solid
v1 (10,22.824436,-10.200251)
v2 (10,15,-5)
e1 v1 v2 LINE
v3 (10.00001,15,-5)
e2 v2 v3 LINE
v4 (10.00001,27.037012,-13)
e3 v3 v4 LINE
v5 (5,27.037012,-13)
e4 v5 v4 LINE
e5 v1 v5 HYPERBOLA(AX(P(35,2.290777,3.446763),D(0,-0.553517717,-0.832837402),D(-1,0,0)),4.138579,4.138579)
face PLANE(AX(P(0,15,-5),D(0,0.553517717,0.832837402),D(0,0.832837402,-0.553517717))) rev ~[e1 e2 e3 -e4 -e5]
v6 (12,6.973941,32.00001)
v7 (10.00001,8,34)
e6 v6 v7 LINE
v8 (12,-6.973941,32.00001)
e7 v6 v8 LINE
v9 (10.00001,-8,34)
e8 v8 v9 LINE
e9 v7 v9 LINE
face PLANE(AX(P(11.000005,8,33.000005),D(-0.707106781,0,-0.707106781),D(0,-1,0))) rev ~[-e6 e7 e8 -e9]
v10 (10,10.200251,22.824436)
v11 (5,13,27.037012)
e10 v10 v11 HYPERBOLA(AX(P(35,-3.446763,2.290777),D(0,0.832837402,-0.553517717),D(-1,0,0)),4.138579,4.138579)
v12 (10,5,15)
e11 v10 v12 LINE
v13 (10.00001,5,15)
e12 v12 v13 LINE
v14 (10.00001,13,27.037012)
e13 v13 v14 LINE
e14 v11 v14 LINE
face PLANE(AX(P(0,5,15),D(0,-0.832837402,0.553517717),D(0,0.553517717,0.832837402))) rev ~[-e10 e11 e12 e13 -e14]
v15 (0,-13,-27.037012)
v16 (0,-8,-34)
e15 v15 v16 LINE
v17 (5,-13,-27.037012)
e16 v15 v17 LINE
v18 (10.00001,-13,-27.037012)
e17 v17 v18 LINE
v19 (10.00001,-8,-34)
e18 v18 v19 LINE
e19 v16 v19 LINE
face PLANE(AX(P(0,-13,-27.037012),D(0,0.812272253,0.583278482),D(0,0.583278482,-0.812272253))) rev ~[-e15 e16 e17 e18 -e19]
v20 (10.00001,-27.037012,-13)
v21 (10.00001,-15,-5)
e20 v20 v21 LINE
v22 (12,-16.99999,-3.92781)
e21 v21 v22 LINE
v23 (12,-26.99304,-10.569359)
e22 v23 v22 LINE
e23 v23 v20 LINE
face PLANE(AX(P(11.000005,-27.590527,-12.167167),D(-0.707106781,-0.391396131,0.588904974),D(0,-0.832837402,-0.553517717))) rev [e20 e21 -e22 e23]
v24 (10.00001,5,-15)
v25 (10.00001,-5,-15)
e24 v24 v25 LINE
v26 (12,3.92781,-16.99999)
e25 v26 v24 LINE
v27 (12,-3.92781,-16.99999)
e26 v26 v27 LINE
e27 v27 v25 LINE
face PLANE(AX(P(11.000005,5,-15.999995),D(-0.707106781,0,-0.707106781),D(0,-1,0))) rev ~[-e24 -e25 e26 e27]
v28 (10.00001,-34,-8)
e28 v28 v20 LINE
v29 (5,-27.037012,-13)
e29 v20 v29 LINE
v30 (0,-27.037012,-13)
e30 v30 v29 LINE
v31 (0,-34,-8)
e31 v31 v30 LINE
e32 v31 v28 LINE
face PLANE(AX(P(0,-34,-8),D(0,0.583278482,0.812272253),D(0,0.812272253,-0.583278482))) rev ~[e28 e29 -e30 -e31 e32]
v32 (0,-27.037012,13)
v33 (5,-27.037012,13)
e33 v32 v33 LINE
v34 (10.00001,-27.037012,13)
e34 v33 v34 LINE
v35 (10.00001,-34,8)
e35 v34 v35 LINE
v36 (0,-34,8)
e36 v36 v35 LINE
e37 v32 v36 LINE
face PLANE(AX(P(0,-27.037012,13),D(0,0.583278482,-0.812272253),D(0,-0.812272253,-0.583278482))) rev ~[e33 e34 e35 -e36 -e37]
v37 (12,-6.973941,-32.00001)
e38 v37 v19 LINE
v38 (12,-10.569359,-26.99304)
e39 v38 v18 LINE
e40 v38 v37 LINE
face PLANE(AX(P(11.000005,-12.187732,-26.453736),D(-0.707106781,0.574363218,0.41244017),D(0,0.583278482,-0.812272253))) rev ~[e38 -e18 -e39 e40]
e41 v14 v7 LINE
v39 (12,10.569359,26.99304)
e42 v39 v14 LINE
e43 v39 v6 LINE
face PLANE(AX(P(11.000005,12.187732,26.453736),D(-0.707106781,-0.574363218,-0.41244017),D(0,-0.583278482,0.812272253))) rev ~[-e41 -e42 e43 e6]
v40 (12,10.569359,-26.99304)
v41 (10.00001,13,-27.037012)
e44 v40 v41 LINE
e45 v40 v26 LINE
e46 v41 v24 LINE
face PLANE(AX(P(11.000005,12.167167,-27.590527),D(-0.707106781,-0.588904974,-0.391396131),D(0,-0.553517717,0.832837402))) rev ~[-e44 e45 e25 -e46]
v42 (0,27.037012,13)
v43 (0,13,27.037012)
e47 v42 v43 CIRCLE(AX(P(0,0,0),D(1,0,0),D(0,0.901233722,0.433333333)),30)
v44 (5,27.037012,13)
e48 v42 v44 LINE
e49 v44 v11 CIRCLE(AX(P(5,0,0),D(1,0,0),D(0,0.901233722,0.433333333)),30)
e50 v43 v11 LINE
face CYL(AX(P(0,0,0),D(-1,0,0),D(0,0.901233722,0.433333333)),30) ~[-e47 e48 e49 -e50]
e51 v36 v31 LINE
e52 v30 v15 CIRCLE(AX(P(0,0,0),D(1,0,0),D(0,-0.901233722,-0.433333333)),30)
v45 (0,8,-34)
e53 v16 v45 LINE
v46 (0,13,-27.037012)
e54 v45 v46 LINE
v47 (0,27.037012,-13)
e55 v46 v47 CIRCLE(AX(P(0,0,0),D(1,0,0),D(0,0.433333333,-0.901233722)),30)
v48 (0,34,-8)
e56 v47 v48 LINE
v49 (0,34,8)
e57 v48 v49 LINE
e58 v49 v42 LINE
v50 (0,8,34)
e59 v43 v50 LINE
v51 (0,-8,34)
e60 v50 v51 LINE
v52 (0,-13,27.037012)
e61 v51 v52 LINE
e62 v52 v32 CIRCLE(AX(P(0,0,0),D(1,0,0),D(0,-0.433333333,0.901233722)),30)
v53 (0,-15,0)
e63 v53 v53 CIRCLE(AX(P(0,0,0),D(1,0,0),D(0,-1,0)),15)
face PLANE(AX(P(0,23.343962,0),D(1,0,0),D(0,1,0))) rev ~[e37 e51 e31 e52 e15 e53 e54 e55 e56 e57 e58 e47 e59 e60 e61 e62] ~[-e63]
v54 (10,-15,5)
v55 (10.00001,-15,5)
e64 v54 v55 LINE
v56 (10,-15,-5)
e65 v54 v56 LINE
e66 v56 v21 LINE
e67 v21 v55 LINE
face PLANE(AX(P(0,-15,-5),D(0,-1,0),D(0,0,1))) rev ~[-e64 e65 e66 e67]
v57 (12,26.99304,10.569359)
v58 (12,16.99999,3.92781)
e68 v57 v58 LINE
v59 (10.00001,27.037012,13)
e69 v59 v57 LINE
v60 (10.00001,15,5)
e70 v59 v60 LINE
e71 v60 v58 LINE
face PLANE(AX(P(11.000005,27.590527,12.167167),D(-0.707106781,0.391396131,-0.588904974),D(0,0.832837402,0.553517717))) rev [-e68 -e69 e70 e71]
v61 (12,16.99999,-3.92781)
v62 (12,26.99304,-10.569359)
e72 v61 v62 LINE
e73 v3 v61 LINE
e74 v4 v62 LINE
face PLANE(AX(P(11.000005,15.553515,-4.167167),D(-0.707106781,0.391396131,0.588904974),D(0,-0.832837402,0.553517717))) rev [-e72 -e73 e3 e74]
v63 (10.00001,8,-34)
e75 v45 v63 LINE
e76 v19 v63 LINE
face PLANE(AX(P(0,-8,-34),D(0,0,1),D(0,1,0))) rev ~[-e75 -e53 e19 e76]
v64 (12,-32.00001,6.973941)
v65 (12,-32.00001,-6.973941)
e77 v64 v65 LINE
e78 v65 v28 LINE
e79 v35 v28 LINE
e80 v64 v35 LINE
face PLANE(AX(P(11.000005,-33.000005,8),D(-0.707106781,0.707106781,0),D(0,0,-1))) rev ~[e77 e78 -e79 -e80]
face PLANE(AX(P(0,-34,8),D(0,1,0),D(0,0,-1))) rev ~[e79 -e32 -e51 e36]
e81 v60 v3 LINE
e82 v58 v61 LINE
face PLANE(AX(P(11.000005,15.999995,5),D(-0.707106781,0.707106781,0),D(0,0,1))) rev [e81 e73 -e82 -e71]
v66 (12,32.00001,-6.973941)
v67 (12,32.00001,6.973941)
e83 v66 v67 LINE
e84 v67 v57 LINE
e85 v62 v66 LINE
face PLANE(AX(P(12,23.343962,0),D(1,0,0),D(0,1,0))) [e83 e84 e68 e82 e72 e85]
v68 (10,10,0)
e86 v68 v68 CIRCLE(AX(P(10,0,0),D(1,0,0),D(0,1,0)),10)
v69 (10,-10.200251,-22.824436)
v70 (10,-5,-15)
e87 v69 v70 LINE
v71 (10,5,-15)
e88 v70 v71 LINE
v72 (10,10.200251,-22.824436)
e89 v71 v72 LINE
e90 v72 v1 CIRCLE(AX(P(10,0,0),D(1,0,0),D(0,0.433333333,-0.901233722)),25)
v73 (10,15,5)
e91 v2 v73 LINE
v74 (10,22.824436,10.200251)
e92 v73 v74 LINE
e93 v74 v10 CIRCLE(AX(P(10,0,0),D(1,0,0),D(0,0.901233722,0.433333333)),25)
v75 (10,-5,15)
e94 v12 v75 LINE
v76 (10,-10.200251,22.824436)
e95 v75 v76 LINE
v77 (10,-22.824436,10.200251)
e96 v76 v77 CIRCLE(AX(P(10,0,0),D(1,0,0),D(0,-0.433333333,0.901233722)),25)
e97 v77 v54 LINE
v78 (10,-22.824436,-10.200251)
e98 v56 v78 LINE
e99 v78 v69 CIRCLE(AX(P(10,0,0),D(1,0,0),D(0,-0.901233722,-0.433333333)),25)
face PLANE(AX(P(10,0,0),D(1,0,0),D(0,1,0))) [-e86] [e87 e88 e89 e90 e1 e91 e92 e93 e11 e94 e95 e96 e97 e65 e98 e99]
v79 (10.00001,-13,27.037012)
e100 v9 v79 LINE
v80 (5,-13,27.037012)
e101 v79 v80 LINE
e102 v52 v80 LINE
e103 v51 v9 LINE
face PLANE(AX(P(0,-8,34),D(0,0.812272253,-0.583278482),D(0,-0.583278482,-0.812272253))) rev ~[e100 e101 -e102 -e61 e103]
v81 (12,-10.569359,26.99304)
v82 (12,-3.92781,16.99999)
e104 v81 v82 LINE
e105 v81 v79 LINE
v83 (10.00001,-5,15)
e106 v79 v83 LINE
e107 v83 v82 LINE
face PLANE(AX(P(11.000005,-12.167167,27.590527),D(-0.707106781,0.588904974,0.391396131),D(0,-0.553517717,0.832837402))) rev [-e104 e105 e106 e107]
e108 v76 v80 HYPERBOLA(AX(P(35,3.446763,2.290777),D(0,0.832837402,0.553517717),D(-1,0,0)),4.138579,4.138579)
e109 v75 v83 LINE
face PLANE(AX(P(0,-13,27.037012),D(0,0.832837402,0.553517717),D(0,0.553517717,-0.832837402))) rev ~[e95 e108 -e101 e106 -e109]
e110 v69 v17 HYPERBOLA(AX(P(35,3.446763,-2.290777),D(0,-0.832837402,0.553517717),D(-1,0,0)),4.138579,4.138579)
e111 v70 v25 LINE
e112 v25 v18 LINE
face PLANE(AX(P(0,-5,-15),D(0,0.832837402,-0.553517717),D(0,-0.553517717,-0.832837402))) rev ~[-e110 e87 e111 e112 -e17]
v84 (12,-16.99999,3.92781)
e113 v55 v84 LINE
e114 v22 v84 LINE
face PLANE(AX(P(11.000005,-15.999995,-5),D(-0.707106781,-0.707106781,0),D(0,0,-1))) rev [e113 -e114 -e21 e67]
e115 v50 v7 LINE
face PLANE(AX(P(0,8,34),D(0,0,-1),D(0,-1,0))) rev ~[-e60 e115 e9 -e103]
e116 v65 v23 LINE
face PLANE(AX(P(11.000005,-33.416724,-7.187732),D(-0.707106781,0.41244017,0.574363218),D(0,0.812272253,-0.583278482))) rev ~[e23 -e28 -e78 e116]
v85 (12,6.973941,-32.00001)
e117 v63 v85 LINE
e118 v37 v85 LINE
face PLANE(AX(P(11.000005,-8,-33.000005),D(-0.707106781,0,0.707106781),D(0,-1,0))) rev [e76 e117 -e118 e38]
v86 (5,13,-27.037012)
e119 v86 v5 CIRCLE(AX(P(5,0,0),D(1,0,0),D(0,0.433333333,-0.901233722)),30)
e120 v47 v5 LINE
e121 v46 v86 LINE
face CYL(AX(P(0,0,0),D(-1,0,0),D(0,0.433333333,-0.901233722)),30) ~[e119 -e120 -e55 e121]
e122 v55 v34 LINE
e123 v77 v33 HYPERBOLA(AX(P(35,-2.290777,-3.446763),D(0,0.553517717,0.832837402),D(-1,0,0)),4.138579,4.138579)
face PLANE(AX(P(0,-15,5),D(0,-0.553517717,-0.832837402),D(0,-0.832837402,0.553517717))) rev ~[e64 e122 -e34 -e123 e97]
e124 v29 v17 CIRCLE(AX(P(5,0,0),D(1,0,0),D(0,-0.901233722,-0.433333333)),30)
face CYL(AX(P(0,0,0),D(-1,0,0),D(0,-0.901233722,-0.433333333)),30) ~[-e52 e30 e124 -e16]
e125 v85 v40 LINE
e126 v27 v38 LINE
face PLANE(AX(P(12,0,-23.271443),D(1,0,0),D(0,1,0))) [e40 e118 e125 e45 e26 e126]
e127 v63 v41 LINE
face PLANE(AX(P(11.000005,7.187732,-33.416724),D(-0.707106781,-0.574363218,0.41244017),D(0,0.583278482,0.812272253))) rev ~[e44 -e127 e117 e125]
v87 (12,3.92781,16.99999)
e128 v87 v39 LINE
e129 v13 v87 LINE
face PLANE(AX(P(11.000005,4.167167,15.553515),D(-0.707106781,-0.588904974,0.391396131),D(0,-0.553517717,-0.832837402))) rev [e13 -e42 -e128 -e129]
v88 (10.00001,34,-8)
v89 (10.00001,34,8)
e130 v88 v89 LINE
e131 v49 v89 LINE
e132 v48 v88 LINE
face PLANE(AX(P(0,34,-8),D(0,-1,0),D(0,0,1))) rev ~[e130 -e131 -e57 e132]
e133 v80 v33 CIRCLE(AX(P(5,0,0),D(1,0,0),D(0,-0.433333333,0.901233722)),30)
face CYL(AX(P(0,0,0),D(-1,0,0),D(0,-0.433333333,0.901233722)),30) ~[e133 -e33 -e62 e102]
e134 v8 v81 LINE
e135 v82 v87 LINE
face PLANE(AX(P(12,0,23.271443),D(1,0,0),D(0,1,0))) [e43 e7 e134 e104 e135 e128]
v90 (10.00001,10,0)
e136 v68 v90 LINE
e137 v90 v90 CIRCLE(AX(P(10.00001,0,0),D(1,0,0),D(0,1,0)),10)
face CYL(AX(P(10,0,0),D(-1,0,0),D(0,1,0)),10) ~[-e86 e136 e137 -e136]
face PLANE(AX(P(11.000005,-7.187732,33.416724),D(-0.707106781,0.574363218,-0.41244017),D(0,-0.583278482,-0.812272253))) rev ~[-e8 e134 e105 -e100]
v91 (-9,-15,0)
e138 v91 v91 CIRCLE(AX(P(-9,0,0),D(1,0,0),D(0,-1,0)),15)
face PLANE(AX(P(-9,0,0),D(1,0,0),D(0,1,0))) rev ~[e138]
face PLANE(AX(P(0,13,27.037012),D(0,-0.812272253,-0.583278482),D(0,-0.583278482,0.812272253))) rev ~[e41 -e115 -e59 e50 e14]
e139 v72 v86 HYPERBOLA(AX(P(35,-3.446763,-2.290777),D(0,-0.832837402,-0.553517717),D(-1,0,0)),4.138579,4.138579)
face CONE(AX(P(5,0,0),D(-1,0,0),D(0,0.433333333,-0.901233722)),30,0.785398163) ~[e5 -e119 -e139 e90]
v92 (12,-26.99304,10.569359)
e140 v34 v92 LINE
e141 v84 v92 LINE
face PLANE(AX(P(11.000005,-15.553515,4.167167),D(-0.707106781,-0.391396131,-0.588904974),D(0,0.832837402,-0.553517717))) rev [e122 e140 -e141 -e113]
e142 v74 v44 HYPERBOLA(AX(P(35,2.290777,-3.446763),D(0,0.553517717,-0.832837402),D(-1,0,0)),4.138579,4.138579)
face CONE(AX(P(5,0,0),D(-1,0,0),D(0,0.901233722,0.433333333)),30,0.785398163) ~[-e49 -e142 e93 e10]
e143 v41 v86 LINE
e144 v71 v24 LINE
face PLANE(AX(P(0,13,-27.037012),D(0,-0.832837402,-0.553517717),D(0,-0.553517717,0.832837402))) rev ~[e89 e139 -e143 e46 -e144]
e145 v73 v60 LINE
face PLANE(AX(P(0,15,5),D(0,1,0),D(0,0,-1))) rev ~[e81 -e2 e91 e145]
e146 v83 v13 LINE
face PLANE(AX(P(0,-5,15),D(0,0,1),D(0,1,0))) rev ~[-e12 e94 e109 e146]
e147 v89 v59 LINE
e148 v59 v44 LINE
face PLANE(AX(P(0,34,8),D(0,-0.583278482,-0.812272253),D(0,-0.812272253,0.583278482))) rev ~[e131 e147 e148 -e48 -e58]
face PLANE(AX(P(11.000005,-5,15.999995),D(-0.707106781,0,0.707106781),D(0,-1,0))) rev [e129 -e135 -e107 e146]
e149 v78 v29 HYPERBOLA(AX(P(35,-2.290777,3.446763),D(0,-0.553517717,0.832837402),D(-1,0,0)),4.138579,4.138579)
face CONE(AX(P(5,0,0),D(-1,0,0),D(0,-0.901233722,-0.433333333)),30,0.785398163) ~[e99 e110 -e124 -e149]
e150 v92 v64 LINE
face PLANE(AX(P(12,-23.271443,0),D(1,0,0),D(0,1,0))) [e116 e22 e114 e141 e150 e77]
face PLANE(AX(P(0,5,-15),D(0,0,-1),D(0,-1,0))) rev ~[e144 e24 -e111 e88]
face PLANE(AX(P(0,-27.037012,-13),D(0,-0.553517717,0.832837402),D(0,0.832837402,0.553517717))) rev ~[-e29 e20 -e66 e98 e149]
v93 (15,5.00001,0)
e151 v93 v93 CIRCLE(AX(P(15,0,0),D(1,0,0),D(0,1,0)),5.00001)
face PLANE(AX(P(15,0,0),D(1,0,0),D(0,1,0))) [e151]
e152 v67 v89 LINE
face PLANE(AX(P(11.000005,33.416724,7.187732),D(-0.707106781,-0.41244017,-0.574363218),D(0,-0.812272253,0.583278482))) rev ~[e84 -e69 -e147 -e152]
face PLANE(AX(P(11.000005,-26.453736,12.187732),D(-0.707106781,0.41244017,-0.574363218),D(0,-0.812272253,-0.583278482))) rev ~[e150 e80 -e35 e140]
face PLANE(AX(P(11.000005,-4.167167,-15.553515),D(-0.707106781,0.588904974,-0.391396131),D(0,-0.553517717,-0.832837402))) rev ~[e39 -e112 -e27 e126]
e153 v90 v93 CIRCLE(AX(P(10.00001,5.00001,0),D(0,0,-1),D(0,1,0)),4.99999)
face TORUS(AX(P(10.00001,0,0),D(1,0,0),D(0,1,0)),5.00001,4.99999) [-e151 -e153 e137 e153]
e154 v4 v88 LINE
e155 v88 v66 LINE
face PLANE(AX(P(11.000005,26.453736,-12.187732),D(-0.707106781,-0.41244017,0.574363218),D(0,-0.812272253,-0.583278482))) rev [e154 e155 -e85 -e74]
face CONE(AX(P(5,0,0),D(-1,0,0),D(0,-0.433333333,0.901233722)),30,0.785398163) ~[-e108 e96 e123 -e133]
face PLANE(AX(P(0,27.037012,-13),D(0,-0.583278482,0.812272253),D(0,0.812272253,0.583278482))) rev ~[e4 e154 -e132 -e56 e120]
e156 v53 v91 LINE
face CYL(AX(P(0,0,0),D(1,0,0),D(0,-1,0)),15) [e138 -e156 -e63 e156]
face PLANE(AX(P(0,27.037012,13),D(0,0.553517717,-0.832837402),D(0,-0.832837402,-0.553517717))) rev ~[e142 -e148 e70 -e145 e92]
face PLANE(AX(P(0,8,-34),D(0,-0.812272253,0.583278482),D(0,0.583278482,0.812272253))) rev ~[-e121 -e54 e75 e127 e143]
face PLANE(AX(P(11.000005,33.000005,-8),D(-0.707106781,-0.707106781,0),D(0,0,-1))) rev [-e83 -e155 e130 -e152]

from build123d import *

# Parameters (mm, degrees)
F1_DEPTH = 10
F2_DEPTH = 12
F3_SIZE  = 5
F4_SIZE  = 1.99999
F5_R     = 10
F6_DEPTH = 5
F7_R     = 4.99999
F9_DEPTH = 9


# Not quite as in the source:
# - a fillet or chamfer is up to 0.001 mm smaller than in the source, because OpenCascade refuses the exact size


with BuildPart() as f1:
    # F0 (on Right) → F1 (new body)
    with BuildSketch(Plane.YZ):
        with BuildLine():
            Line((15, 5), (27.0370116692, 13))
            ThreePointArc((27.0370116692, 13), (21.2132034356, 21.2132034356), (13, 27.0370116692))
            Line((13, 27.0370116692), (5, 15))
            Line((5, 15), (0, 15))
            Line((0, 15), (-5, 15))
            Line((-5, 15), (-13, 27.0370116692))
            ThreePointArc((-13, 27.0370116692), (-21.2132034356, 21.2132034356), (-27.0370116692, 13))
            Line((-27.0370116692, 13), (-15, 5))
            Line((-15, 5), (-15, 0))
            Line((-15, 0), (-15, -5))
            Line((-15, -5), (-27.0370116692, -13))
            ThreePointArc((-27.0370116692, -13), (-21.2132034356, -21.2132034356), (-13, -27.0370116692))
            Line((-13, -27.0370116692), (-5, -15))
            Line((-5, -15), (0, -15))
            Line((0, -15), (5, -15))
            Line((5, -15), (13, -27.0370116692))
            ThreePointArc((13, -27.0370116692), (21.2132034356, -21.2132034356), (27.0370116692, -13))
            Line((27.0370116692, -13), (15, -5))
            Line((15, -5), (15, 0))
            Line((15, 0), (15, 5))
        make_face()
    extrude(amount=F1_DEPTH)

    # F0 (on Right) → F2 (join)
    with BuildSketch(Plane.YZ):
        with BuildLine():
            ThreePointArc((27.0370116692, -13), (29.2498747867, -6.6666952054), (30, 0))
            ThreePointArc((30, 0), (29.2498747867, 6.6666952054), (27.0370116692, 13))
            Line((27.0370116692, 13), (15, 5))
            Line((15, 5), (15, 0))
            Line((15, 0), (15, -5))
            Line((15, -5), (27.0370116692, -13))
        make_face()
        with BuildLine():
            ThreePointArc((27.0370116692, 13), (29.2498747867, 6.6666952054), (30, 0))
            ThreePointArc((30, 0), (29.2498747867, -6.6666952054), (27.0370116692, -13))
            Line((27.0370116692, -13), (34, -8))
            Line((34, -8), (34, 0))
            Line((34, 0), (34, 8))
            Line((34, 8), (27.0370116692, 13))
        make_face()
        with BuildLine():
            Line((5, 15), (13, 27.0370116692))
            ThreePointArc((13, 27.0370116692), (0, 30), (-13, 27.0370116692))
            Line((-13, 27.0370116692), (-5, 15))
            Line((-5, 15), (0, 15))
            Line((0, 15), (5, 15))
        make_face()
        with BuildLine():
            ThreePointArc((-13, 27.0370116692), (0, 30), (13, 27.0370116692))
            Line((13, 27.0370116692), (8, 34))
            Line((8, 34), (0, 34))
            Line((0, 34), (-8, 34))
            Line((-8, 34), (-13, 27.0370116692))
        make_face()
        with BuildLine():
            Line((-15, 5), (-27.0370116692, 13))
            ThreePointArc((-27.0370116692, 13), (-30, 0), (-27.0370116692, -13))
            Line((-27.0370116692, -13), (-15, -5))
            Line((-15, -5), (-15, 0))
            Line((-15, 0), (-15, 5))
        make_face()
        with BuildLine():
            ThreePointArc((-27.0370116692, -13), (-30, 0), (-27.0370116692, 13))
            Line((-27.0370116692, 13), (-34, 8))
            Line((-34, 8), (-34, 0))
            Line((-34, 0), (-34, -8))
            Line((-34, -8), (-27.0370116692, -13))
        make_face()
        with BuildLine():
            ThreePointArc((-13, -27.0370116692), (0, -30), (13, -27.0370116692))
            Line((13, -27.0370116692), (5, -15))
            Line((5, -15), (0, -15))
            Line((0, -15), (-5, -15))
            Line((-5, -15), (-13, -27.0370116692))
        make_face()
        with BuildLine():
            Line((8, -34), (13, -27.0370116692))
            ThreePointArc((13, -27.0370116692), (0, -30), (-13, -27.0370116692))
            Line((-13, -27.0370116692), (-8, -34))
            Line((-8, -34), (0, -34))
            Line((0, -34), (8, -34))
        make_face()
    extrude(amount=F2_DEPTH)

    # F3
    f3_edges = [f1.edges().sort_by_distance(p)[0] for p in [
        (10, 21.213203, 21.213203),
        (10, -21.213203, 21.213203),
        (10, -21.213203, -21.213203),
        (10, 21.213203, -21.213203),
    ]]
    chamfer(f3_edges, length=F3_SIZE)

    # F4 (size 2 in the source; OpenCascade refuses exactly that, so slightly less here)
    f4_edges = [f1.edges().sort_by_distance(p)[0] for p in [
        (12, 0, 34),
        (12, -10.5, 30.518506),
        (12, 10.5, 30.518506),
        (12, -9, 21.018506),
        (12, 9, 21.018506),
        (12, 0, 15),
        (12, -15, 0),
        (12, -21.018506, 9),
        (12, -30.518506, 10.5),
        (12, -34, 0),
        (12, -30.518506, -10.5),
        (12, -21.018506, -9),
        (12, 0, -15),
        (12, -9, -21.018506),
        (12, -10.5, -30.518506),
        (12, 0, -34),
        (12, 10.5, -30.518506),
        (12, 9, -21.018506),
        (12, 15, 0),
        (12, 21.018506, 9),
        (12, 30.518506, 10.5),
        (12, 34, 0),
        (12, 21.018506, -9),
        (12, 30.518506, -10.5),
    ]]
    chamfer(f4_edges, length=F4_SIZE)

    # F5 (on face) → F6 (join)
    with BuildSketch(Plane.YZ.offset(10)):
        Circle(F5_R)
    extrude(amount=F6_DEPTH)

    # F7 (radius 5 in the source; OpenCascade refuses exactly that, so slightly less here)
    f7_edges = [f1.edges().sort_by_distance(p)[0] for p in [
        (15, -10, 0),
    ]]
    fillet(f7_edges, radius=F7_R)

    # F8 (on face) → F9 (join)
    with BuildSketch(Plane.YZ):
        with BuildLine():
            ThreePointArc((0, -15), (10.6066017178, -10.6066017178), (15, 0))
            ThreePointArc((15, 0), (10.6066017178, 10.6066017178), (0, 15))
            ThreePointArc((0, 15), (-10.6066017178, 10.6066017178), (-15, 0))
            ThreePointArc((-15, 0), (-10.6066017178, -10.6066017178), (0, -15))
        make_face()
    extrude(amount=-F9_DEPTH)


solid = f1.part
